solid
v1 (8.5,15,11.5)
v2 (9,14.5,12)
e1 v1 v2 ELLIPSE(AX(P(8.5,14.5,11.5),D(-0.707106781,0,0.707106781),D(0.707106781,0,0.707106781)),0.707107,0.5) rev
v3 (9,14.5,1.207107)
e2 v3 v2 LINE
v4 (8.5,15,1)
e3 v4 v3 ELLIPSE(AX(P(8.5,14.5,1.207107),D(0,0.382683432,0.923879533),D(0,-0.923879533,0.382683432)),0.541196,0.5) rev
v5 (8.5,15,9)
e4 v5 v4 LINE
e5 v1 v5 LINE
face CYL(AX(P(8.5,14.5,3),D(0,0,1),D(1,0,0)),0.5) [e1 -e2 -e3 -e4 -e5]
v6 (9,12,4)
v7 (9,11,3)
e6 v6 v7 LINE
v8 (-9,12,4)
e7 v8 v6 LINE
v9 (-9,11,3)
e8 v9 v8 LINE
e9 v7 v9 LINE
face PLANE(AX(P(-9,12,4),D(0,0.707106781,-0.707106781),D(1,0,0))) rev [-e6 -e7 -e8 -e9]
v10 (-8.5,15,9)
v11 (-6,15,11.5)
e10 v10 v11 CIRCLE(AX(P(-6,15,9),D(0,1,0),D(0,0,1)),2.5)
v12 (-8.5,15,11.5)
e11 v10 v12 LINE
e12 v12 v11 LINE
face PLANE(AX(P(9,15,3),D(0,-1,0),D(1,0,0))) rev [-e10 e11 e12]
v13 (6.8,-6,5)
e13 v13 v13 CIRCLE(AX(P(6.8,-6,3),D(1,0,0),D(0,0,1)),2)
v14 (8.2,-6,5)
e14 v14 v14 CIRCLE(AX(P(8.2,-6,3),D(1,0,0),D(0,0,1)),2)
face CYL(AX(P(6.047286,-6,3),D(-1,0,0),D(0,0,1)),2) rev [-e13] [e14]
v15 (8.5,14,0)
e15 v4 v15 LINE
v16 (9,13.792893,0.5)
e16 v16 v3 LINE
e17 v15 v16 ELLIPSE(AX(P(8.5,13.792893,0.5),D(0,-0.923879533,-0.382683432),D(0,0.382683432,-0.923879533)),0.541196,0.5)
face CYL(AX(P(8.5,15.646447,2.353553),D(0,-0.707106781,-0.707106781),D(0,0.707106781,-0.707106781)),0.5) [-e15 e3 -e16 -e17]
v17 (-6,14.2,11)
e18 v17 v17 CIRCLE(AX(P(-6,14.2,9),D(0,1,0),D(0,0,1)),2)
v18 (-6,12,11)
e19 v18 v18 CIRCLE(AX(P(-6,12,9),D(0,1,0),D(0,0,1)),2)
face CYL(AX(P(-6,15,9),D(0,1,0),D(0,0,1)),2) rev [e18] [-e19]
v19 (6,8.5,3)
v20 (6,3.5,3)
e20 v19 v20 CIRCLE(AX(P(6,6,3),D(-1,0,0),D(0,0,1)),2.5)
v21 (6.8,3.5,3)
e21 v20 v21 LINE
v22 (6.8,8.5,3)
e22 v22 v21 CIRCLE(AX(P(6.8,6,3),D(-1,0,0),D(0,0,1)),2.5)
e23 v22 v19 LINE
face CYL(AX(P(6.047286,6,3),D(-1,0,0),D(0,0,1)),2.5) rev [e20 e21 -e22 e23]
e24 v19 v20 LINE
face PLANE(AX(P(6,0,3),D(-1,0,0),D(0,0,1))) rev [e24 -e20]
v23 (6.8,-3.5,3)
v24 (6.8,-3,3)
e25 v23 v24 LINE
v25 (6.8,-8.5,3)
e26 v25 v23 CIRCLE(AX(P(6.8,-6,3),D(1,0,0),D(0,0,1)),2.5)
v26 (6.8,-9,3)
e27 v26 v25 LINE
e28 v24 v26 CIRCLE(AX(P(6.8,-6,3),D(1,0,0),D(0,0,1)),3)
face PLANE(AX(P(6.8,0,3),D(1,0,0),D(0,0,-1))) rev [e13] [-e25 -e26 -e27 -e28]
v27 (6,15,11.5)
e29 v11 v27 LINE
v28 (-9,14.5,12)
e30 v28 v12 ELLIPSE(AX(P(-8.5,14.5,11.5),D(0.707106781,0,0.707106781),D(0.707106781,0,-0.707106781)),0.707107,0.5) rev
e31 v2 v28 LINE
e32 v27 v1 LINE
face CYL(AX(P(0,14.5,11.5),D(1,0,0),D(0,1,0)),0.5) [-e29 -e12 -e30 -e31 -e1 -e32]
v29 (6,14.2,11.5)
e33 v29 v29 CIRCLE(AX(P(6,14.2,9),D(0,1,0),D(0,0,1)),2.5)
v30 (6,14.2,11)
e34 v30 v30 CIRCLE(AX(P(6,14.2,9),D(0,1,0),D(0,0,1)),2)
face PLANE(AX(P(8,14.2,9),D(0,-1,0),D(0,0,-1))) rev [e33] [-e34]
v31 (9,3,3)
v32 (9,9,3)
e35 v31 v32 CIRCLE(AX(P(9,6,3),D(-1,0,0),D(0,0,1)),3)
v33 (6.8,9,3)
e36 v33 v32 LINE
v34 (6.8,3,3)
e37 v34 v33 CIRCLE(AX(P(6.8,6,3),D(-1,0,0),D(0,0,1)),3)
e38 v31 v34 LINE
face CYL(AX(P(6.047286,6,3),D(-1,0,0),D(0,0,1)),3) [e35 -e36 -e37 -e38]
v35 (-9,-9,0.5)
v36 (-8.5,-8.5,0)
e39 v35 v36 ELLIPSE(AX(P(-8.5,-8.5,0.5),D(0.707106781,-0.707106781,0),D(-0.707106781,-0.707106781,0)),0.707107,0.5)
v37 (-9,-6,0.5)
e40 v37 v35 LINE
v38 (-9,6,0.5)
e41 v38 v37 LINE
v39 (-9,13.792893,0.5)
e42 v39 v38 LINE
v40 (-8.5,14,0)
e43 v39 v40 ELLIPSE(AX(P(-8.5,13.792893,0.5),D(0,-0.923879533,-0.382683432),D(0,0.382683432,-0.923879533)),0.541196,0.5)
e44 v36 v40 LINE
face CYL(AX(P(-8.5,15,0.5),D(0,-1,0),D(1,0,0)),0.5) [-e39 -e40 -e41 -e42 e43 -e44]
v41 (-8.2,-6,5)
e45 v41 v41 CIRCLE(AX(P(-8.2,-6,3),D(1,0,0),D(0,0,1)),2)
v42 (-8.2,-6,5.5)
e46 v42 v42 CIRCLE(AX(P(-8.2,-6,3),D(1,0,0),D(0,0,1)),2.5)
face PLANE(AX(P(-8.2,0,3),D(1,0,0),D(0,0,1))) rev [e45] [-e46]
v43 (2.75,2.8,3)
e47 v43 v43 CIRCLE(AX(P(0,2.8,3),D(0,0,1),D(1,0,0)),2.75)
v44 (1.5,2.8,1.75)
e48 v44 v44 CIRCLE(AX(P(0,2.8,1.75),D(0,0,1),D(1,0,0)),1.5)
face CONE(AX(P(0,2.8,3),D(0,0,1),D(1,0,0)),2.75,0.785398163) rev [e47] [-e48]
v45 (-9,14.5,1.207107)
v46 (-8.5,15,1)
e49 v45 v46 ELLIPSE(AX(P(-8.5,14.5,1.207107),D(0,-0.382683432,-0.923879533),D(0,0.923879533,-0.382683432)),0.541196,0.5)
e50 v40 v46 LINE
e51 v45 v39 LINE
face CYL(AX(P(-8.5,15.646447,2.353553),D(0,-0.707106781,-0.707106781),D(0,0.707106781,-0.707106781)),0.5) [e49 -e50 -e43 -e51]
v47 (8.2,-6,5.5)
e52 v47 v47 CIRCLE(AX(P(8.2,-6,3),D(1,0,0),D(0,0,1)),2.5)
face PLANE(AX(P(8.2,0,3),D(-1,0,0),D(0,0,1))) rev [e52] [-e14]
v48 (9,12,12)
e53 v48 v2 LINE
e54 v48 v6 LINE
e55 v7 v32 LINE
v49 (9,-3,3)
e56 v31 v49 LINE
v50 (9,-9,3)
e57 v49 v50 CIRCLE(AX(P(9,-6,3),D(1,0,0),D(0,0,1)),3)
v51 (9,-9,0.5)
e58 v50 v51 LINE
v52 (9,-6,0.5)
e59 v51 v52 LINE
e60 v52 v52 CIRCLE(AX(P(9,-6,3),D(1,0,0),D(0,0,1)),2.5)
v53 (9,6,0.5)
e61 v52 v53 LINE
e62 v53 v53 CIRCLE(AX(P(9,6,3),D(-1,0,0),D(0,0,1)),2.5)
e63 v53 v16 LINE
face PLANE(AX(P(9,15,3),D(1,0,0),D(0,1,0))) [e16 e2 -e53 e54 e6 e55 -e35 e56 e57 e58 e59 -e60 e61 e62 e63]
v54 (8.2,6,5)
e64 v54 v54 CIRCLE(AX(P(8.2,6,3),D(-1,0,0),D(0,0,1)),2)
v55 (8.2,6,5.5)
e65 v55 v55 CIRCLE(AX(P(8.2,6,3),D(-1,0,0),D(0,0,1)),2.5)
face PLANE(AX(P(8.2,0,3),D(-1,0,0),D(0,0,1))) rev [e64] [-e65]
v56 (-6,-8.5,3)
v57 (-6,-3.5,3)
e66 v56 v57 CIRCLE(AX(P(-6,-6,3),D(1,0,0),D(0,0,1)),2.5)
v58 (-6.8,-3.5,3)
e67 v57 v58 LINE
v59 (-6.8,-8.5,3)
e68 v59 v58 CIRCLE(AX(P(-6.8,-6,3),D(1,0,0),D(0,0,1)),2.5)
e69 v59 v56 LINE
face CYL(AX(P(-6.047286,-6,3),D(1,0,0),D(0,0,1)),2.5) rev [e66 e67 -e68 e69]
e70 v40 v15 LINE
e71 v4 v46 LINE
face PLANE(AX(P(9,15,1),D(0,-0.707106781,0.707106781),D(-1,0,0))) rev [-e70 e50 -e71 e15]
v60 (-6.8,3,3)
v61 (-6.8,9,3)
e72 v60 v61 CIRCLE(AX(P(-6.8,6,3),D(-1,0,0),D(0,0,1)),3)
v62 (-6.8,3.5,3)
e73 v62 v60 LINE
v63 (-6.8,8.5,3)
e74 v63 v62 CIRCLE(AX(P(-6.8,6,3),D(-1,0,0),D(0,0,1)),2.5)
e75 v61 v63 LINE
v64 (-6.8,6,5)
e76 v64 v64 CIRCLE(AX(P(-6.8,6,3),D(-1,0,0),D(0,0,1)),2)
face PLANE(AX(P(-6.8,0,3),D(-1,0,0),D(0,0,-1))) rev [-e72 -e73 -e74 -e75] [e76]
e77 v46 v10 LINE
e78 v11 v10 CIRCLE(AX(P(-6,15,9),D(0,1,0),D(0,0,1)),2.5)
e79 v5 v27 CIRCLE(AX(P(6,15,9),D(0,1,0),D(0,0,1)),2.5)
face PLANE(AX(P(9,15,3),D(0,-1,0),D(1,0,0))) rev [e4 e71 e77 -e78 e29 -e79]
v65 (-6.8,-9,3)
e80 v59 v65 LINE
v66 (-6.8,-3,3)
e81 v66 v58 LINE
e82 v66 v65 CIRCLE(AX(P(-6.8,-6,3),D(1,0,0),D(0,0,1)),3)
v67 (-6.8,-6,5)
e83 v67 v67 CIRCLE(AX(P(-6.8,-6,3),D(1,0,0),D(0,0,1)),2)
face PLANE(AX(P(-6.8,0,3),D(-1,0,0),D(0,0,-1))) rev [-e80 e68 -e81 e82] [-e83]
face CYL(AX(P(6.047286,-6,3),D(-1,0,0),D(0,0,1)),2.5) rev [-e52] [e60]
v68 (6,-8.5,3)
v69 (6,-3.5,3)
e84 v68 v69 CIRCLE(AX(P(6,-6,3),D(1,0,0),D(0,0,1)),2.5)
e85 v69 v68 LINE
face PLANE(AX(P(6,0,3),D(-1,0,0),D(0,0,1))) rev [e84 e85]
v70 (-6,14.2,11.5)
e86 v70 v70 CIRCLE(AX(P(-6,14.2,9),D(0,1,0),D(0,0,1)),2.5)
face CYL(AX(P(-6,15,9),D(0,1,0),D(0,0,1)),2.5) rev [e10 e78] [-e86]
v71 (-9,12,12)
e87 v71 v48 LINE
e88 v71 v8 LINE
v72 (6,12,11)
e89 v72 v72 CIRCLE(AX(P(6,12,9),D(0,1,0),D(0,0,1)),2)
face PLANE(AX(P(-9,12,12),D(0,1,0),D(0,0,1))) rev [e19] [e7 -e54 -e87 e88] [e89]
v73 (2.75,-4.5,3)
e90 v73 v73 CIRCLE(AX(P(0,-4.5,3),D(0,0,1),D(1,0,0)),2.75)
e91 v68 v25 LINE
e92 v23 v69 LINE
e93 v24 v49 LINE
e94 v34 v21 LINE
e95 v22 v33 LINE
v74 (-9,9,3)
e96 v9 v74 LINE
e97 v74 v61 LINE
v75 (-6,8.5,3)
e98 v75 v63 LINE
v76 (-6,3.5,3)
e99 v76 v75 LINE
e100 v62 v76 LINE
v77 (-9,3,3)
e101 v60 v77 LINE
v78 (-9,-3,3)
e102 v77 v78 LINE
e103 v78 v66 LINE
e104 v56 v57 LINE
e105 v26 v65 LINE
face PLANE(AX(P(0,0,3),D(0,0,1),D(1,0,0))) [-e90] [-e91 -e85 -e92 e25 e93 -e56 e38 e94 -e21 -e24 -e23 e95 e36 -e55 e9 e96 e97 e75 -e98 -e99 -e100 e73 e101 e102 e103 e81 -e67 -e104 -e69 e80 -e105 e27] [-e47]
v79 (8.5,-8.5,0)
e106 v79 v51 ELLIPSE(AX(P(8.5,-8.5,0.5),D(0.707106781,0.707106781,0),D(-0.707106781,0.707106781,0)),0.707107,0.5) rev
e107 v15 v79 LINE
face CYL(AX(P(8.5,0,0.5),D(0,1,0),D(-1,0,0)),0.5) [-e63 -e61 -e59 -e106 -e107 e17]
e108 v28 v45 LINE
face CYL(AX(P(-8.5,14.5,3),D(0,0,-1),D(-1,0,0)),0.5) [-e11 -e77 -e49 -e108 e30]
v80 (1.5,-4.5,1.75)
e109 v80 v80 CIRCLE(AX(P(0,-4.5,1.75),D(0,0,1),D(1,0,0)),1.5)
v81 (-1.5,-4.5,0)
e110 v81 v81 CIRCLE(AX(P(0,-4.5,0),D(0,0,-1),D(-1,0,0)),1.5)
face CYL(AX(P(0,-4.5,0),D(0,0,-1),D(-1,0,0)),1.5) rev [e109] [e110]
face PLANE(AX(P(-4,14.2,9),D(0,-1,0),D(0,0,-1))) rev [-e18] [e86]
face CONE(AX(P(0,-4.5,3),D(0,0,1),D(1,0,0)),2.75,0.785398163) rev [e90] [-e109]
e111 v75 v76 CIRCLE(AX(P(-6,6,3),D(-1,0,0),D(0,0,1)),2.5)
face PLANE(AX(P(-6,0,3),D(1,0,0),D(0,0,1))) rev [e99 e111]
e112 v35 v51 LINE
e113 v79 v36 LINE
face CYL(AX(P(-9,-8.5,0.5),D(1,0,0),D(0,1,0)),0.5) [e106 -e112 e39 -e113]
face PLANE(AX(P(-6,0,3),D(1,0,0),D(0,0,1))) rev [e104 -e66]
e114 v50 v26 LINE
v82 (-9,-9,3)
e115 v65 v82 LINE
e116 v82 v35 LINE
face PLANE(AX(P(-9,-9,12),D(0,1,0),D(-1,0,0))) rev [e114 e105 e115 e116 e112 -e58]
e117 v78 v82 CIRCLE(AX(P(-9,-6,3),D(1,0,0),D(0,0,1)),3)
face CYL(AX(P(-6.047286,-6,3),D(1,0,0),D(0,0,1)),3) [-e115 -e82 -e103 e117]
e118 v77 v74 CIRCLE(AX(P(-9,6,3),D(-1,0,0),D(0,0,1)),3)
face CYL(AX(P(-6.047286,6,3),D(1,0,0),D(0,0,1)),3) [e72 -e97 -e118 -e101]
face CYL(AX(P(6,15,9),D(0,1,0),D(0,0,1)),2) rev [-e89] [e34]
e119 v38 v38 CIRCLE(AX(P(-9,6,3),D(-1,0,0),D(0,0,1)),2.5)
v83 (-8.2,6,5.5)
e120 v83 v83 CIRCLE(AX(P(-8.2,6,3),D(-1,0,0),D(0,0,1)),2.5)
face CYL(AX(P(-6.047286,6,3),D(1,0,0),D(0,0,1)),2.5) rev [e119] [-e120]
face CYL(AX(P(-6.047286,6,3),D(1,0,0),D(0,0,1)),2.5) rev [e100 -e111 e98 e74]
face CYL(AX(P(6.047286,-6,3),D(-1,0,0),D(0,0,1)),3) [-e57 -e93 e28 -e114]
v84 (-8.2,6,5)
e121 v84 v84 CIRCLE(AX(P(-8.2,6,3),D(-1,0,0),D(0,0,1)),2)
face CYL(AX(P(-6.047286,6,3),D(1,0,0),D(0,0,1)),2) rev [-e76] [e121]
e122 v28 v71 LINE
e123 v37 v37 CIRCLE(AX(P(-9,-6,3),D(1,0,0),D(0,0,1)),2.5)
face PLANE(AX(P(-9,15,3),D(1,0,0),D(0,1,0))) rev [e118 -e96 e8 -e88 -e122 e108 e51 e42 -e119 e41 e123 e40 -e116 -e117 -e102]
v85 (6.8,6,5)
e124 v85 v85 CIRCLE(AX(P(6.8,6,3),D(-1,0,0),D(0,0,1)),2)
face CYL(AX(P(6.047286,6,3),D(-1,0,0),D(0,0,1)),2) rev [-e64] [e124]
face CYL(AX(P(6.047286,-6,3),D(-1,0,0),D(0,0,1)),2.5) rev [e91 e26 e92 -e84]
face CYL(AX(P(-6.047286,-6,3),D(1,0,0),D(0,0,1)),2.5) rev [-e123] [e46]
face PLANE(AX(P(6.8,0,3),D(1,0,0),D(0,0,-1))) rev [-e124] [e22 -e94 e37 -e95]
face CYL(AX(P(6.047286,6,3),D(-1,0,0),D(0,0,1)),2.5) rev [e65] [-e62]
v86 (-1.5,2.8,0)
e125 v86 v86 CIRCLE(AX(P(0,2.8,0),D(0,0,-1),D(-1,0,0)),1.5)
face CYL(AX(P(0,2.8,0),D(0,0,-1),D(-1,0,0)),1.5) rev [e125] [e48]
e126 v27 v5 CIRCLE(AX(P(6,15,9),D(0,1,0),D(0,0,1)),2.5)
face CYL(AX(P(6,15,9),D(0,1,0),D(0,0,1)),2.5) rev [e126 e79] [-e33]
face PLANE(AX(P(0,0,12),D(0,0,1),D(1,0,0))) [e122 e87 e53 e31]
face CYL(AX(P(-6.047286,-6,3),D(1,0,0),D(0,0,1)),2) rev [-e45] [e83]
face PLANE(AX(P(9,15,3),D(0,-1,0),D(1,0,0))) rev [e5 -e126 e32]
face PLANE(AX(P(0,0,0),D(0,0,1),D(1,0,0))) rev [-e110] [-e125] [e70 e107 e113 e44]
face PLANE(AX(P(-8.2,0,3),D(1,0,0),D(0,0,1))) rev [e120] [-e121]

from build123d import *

# Parameters (mm, degrees)
SKETCH1_W                               = 18
SKETCH1_H                               = 30
BOSS_EXTRUDE1_DEPTH                     = 3
SKETCH3_W                               = 18
SKETCH3_H                               = 3
BOSS_EXTRUDE2_DEPTH                     = 9
CBORE_FOR_M5_HEX_HEAD_BOLT1_D           = 4
CBORE_FOR_M5_HEX_HEAD_BOLT1_DEPTH       = 4
CBORE_FOR_M5_HEX_HEAD_BOLT1_CBORE_D     = 5
CBORE_FOR_M5_HEX_HEAD_BOLT1_CBORE_DEPTH = 0.8
CBORE_FOR_M5_HEX_HEAD_BOLT1_TIP         = 1.178090033
CHAMFER1_SIZE                           = 1
SKETCH8_W                               = 18
SKETCH8_H                               = 6
CUT_EXTRUDE1_DEPTH                      = 12
FILLET2_R                               = 0.5
F_3_0MM_DOWEL_HOLE1_D                   = 3
F_3_0MM_DOWEL_HOLE1_DEPTH               = 10
F_3_0MM_DOWEL_HOLE1_TIP                 = 0.901290929


with BuildPart() as part:
    # Sketch1 → Boss-Extrude1 (new body)
    with BuildSketch(Plane.XY):
        Rectangle(SKETCH1_W, SKETCH1_H)
    extrude(amount=BOSS_EXTRUDE1_DEPTH)

    # Sketch2 → Cut-Revolve1 (revolve, cut)
    with BuildSketch(Plane.XY.offset(3)):
        Polygon((6.8, 8.5), (6, 8.5), (6, 6), (9, 6), (9, 8.5), (8.2, 8.5), (8.2, 8), (6.8, 8), align=None)
    cut_revolve1 = revolve(axis=Axis((6.04728637, 6, 3), (1, 0, 0)), mode=Mode.SUBTRACT)

    # Sketch2<3> → Revolve1 (revolve)
    with BuildSketch(Plane.XY.offset(3), mode=Mode.PRIVATE) as revolve1_sk:
        Polygon((6.8, 9), (6.8, 8.5), (6.8, 8), (8.2, 8), (8.2, 8.5), (9, 8.5), (9, 9), align=None)
    revolve1 = revolve(revolve1_sk.sketch.rotate(Axis((6.04728637, 6, 3), (1, 0, 0)), 90), axis=Axis((6.04728637, 6, 3), (1, 0, 0)))

    # Mirror1: Cut-Revolve1, Revolve1 across plane
    add(cut_revolve1.mirror(Plane(origin=(0, 0, 0), x_dir=(0, 0, 1), z_dir=(1, 0, 0))), mode=Mode.SUBTRACT)
    add(revolve1.mirror(Plane(origin=(0, 0, 0), x_dir=(0, 0, 1), z_dir=(1, 0, 0))))

    # Mirror2: Cut-Revolve1, Revolve1 across plane
    add(cut_revolve1.mirror(Plane.ZX), mode=Mode.SUBTRACT)
    add(revolve1.mirror(Plane.ZX))

    # Mirror2 copy 1 sketch → Mirror2 copy 1 (revolve, cut)
    with BuildSketch(Plane(origin=(0, 0, 3), x_dir=(-1, 0, 0), z_dir=(0, 0, 1))):
        Polygon((6.8, 8.5), (6, 8.5), (6, 6), (9, 6), (9, 8.5), (8.2, 8.5), (8.2, 8), (6.8, 8), align=None)
    revolve(axis=Axis((-6.04728637, -6, 3), (-1, 0, 0)), mode=Mode.SUBTRACT)

    # Mirror2 copy 2 sketch → Mirror2 copy 2 (revolve)
    with BuildSketch(Plane(origin=(0, 0, 3), x_dir=(-1, 0, 0), z_dir=(0, 0, 1))):
        Polygon((6.8, 9), (6.8, 8.5), (6.8, 8), (8.2, 8), (8.2, 8.5), (9, 8.5), (9, 9), align=None)
    revolve(axis=Axis((-6.04728637, -6, 3), (-1, 0, 0)))

    # Sketch3 → Boss-Extrude2 (add)
    with BuildSketch(Plane.XY.offset(3)):
        with Locations((0, 13.5)):
            Rectangle(SKETCH3_W, SKETCH3_H)
    extrude(amount=BOSS_EXTRUDE2_DEPTH)

    # CBORE for M5 Hex Head Bolt1
    with Locations(Plane(origin=(0, 15, 0), x_dir=(1, 0, 0), z_dir=(0, 1, 0))):
        with Locations((-6, -9), (6, -9)):
            CounterBoreHole(CBORE_FOR_M5_HEX_HEAD_BOLT1_D / 2, CBORE_FOR_M5_HEX_HEAD_BOLT1_CBORE_D / 2, CBORE_FOR_M5_HEX_HEAD_BOLT1_CBORE_DEPTH, depth=CBORE_FOR_M5_HEX_HEAD_BOLT1_DEPTH)
            with Locations((0, 0, -(CBORE_FOR_M5_HEX_HEAD_BOLT1_DEPTH + CBORE_FOR_M5_HEX_HEAD_BOLT1_TIP / 2))):  # 119° drill point
                Cone(0, CBORE_FOR_M5_HEX_HEAD_BOLT1_D / 2, CBORE_FOR_M5_HEX_HEAD_BOLT1_TIP, mode=Mode.SUBTRACT)

    # Chamfer1
    chamfer1_edges = [part.edges().sort_by_distance(p)[0] for p in [
        (0, 12, 3),
        (0, 15, 0),
    ]]
    chamfer(chamfer1_edges, length=CHAMFER1_SIZE)

    # Sketch8 → Cut-Extrude1 (cut)
    with BuildSketch(Plane(origin=(0, 0, 0), x_dir=(-1, 0, 0), z_dir=(0, 0, -1))):
        with Locations((0, -12)):
            Rectangle(SKETCH8_W, SKETCH8_H)
    extrude(amount=-CUT_EXTRUDE1_DEPTH, mode=Mode.SUBTRACT)

    # Fillet2
    # the kernel refuses this fillet: 0.5 mm, written as the material it takes off along each edge
    with BuildSketch(Plane(origin=(-10.25, 15, 12), x_dir=(0, 0, -1), z_dir=(1, 0, 0))) as fillet2_piece_1:
        with BuildLine():
            CenterArc((FILLET2_R, -FILLET2_R), FILLET2_R, 90, 90)
            Line((0, -FILLET2_R), (0, 0))
            Line((0, 0), (FILLET2_R, 0))
        make_face()
    extrude(amount=20.5, mode=Mode.SUBTRACT)
    with BuildSketch(Plane(origin=(-9, 6.000000014, 0), x_dir=(1, 0, 0), z_dir=(0, -1, 0))) as fillet2_piece_2:
        with BuildLine():
            CenterArc((FILLET2_R, FILLET2_R), FILLET2_R, 180, 90)
            Line((0, FILLET2_R), (0, 0))
            Line((0, 0), (FILLET2_R, 0))
        make_face()
    extrude(amount=12.000000014, mode=Mode.SUBTRACT)
    with BuildSketch(Plane(origin=(-9, 15.883883476, 1.883883476), x_dir=(0, -0.7071067811865476, 0.7071067811865476), z_dir=(0, -0.7071067811865476, -0.7071067811865476)), Plane(origin=(9, 15.883883476, 1.883883476), x_dir=(-1, 0, 0), z_dir=(0, -0.7071067811865476, -0.7071067811865476))) as fillet2_piece_3:
        with BuildLine():
            CenterArc((FILLET2_R, -FILLET2_R), FILLET2_R, 90, 90)
            Line((0, -FILLET2_R), (0, 0))
            Line((0, 0), (FILLET2_R, 0))
        make_face()
    extrude(amount=3.914213562, mode=Mode.SUBTRACT)
    with BuildSketch(Plane(origin=(9, -6.000000014, 0), x_dir=(-1, 0, 0), z_dir=(0, 1, 0))) as fillet2_piece_4:
        with BuildLine():
            CenterArc((FILLET2_R, FILLET2_R), FILLET2_R, 180, 90)
            Line((0, FILLET2_R), (0, 0))
            Line((0, 0), (FILLET2_R, 0))
        make_face()
    extrude(amount=12.000000015, mode=Mode.SUBTRACT)
    with BuildSketch(Plane(origin=(10.25, -9, 0), x_dir=(0, 0, 1), z_dir=(-1, 0, 0))) as fillet2_piece_5:
        with BuildLine():
            CenterArc((FILLET2_R, FILLET2_R), FILLET2_R, 180, 90)
            Line((0, FILLET2_R), (0, 0))
            Line((0, 0), (FILLET2_R, 0))
        make_face()
    extrude(amount=20.5, mode=Mode.SUBTRACT)
    with BuildSketch(Plane(origin=(9, 15, 13.25), x_dir=(-1, 0, 0), z_dir=(0, 0, -1)), Plane(origin=(-9, 15, -0.25), x_dir=(1, 0, 0), z_dir=(0, 0, 1))) as fillet2_piece_6:
        with BuildLine():
            CenterArc((FILLET2_R, -FILLET2_R), FILLET2_R, 90, 90)
            Line((0, -FILLET2_R), (0, 0))
            Line((0, 0), (FILLET2_R, 0))
        make_face()
    extrude(amount=13.5, mode=Mode.SUBTRACT)
    with BuildSketch(Plane(origin=(9, -10.25, 0), x_dir=(-1, 0, 0), z_dir=(0, 1, 0))) as fillet2_piece_7:
        with BuildLine():
            CenterArc((FILLET2_R, FILLET2_R), FILLET2_R, 180, 90)
            Line((0, FILLET2_R), (0, 0))
            Line((0, 0), (FILLET2_R, 0))
        make_face()
    extrude(amount=4.249999986, mode=Mode.SUBTRACT)
    with BuildSketch(Plane(origin=(9, 6, 0), x_dir=(-1, 0, 0), z_dir=(0, 1, 0))) as fillet2_piece_8:
        with BuildLine():
            CenterArc((FILLET2_R, FILLET2_R), FILLET2_R, 180, 90)
            Line((0, FILLET2_R), (0, 0))
            Line((0, 0), (FILLET2_R, 0))
        make_face()
    extrude(amount=9.25, mode=Mode.SUBTRACT)
    with BuildSketch(Plane(origin=(-9, 15.25, 0), x_dir=(1, 0, 0), z_dir=(0, -1, 0))) as fillet2_piece_9:
        with BuildLine():
            CenterArc((FILLET2_R, FILLET2_R), FILLET2_R, 180, 90)
            Line((0, FILLET2_R), (0, 0))
            Line((0, 0), (FILLET2_R, 0))
        make_face()
    extrude(amount=9.249999986, mode=Mode.SUBTRACT)
    with BuildSketch(Plane(origin=(-9, -6, 0), x_dir=(1, 0, 0), z_dir=(0, -1, 0))) as fillet2_piece_10:
        with BuildLine():
            CenterArc((FILLET2_R, FILLET2_R), FILLET2_R, 180, 90)
            Line((0, FILLET2_R), (0, 0))
            Line((0, 0), (FILLET2_R, 0))
        make_face()
    extrude(amount=4.25, mode=Mode.SUBTRACT)

    # Ø3.0mm Dowel Hole1
    with Locations(Plane(origin=(0, 0, 0), x_dir=(-1, 0, 0), z_dir=(0, 0, -1))):
        with Locations((0, -4.5), (0, 2.8)):
            Hole(F_3_0MM_DOWEL_HOLE1_D / 2, depth=F_3_0MM_DOWEL_HOLE1_DEPTH)
            with Locations((0, 0, -(F_3_0MM_DOWEL_HOLE1_DEPTH + F_3_0MM_DOWEL_HOLE1_TIP / 2))):  # 118° drill point
                Cone(0, F_3_0MM_DOWEL_HOLE1_D / 2, F_3_0MM_DOWEL_HOLE1_TIP, mode=Mode.SUBTRACT)

    # Cut-Extrude2 cone 1 section (through the dimple's axis) → Cut-Extrude2 (revolve, cut)
    with BuildSketch(Plane(origin=(0, 2.8, 3), x_dir=(0, -1, 0), z_dir=(1, 0, 0))):
        Polygon((0, 0), (2.75, 0), (0, 2.75), align=None)
    revolve(axis=Axis((0, 2.8, 3), (0, 0, -1)), mode=Mode.SUBTRACT)

    # Cut-Extrude2 cone 2 section (through the dimple's axis) → Cut-Extrude2 cone 2 (revolve, cut)
    with BuildSketch(Plane(origin=(0, -4.5, 3), x_dir=(0, -1, 0), z_dir=(1, 0, 0))):
        Polygon((0, 0), (2.75, 0), (0, 2.75), align=None)
    revolve(axis=Axis((0, -4.5, 3), (0, 0, -1)), mode=Mode.SUBTRACT)


solid = part.part
